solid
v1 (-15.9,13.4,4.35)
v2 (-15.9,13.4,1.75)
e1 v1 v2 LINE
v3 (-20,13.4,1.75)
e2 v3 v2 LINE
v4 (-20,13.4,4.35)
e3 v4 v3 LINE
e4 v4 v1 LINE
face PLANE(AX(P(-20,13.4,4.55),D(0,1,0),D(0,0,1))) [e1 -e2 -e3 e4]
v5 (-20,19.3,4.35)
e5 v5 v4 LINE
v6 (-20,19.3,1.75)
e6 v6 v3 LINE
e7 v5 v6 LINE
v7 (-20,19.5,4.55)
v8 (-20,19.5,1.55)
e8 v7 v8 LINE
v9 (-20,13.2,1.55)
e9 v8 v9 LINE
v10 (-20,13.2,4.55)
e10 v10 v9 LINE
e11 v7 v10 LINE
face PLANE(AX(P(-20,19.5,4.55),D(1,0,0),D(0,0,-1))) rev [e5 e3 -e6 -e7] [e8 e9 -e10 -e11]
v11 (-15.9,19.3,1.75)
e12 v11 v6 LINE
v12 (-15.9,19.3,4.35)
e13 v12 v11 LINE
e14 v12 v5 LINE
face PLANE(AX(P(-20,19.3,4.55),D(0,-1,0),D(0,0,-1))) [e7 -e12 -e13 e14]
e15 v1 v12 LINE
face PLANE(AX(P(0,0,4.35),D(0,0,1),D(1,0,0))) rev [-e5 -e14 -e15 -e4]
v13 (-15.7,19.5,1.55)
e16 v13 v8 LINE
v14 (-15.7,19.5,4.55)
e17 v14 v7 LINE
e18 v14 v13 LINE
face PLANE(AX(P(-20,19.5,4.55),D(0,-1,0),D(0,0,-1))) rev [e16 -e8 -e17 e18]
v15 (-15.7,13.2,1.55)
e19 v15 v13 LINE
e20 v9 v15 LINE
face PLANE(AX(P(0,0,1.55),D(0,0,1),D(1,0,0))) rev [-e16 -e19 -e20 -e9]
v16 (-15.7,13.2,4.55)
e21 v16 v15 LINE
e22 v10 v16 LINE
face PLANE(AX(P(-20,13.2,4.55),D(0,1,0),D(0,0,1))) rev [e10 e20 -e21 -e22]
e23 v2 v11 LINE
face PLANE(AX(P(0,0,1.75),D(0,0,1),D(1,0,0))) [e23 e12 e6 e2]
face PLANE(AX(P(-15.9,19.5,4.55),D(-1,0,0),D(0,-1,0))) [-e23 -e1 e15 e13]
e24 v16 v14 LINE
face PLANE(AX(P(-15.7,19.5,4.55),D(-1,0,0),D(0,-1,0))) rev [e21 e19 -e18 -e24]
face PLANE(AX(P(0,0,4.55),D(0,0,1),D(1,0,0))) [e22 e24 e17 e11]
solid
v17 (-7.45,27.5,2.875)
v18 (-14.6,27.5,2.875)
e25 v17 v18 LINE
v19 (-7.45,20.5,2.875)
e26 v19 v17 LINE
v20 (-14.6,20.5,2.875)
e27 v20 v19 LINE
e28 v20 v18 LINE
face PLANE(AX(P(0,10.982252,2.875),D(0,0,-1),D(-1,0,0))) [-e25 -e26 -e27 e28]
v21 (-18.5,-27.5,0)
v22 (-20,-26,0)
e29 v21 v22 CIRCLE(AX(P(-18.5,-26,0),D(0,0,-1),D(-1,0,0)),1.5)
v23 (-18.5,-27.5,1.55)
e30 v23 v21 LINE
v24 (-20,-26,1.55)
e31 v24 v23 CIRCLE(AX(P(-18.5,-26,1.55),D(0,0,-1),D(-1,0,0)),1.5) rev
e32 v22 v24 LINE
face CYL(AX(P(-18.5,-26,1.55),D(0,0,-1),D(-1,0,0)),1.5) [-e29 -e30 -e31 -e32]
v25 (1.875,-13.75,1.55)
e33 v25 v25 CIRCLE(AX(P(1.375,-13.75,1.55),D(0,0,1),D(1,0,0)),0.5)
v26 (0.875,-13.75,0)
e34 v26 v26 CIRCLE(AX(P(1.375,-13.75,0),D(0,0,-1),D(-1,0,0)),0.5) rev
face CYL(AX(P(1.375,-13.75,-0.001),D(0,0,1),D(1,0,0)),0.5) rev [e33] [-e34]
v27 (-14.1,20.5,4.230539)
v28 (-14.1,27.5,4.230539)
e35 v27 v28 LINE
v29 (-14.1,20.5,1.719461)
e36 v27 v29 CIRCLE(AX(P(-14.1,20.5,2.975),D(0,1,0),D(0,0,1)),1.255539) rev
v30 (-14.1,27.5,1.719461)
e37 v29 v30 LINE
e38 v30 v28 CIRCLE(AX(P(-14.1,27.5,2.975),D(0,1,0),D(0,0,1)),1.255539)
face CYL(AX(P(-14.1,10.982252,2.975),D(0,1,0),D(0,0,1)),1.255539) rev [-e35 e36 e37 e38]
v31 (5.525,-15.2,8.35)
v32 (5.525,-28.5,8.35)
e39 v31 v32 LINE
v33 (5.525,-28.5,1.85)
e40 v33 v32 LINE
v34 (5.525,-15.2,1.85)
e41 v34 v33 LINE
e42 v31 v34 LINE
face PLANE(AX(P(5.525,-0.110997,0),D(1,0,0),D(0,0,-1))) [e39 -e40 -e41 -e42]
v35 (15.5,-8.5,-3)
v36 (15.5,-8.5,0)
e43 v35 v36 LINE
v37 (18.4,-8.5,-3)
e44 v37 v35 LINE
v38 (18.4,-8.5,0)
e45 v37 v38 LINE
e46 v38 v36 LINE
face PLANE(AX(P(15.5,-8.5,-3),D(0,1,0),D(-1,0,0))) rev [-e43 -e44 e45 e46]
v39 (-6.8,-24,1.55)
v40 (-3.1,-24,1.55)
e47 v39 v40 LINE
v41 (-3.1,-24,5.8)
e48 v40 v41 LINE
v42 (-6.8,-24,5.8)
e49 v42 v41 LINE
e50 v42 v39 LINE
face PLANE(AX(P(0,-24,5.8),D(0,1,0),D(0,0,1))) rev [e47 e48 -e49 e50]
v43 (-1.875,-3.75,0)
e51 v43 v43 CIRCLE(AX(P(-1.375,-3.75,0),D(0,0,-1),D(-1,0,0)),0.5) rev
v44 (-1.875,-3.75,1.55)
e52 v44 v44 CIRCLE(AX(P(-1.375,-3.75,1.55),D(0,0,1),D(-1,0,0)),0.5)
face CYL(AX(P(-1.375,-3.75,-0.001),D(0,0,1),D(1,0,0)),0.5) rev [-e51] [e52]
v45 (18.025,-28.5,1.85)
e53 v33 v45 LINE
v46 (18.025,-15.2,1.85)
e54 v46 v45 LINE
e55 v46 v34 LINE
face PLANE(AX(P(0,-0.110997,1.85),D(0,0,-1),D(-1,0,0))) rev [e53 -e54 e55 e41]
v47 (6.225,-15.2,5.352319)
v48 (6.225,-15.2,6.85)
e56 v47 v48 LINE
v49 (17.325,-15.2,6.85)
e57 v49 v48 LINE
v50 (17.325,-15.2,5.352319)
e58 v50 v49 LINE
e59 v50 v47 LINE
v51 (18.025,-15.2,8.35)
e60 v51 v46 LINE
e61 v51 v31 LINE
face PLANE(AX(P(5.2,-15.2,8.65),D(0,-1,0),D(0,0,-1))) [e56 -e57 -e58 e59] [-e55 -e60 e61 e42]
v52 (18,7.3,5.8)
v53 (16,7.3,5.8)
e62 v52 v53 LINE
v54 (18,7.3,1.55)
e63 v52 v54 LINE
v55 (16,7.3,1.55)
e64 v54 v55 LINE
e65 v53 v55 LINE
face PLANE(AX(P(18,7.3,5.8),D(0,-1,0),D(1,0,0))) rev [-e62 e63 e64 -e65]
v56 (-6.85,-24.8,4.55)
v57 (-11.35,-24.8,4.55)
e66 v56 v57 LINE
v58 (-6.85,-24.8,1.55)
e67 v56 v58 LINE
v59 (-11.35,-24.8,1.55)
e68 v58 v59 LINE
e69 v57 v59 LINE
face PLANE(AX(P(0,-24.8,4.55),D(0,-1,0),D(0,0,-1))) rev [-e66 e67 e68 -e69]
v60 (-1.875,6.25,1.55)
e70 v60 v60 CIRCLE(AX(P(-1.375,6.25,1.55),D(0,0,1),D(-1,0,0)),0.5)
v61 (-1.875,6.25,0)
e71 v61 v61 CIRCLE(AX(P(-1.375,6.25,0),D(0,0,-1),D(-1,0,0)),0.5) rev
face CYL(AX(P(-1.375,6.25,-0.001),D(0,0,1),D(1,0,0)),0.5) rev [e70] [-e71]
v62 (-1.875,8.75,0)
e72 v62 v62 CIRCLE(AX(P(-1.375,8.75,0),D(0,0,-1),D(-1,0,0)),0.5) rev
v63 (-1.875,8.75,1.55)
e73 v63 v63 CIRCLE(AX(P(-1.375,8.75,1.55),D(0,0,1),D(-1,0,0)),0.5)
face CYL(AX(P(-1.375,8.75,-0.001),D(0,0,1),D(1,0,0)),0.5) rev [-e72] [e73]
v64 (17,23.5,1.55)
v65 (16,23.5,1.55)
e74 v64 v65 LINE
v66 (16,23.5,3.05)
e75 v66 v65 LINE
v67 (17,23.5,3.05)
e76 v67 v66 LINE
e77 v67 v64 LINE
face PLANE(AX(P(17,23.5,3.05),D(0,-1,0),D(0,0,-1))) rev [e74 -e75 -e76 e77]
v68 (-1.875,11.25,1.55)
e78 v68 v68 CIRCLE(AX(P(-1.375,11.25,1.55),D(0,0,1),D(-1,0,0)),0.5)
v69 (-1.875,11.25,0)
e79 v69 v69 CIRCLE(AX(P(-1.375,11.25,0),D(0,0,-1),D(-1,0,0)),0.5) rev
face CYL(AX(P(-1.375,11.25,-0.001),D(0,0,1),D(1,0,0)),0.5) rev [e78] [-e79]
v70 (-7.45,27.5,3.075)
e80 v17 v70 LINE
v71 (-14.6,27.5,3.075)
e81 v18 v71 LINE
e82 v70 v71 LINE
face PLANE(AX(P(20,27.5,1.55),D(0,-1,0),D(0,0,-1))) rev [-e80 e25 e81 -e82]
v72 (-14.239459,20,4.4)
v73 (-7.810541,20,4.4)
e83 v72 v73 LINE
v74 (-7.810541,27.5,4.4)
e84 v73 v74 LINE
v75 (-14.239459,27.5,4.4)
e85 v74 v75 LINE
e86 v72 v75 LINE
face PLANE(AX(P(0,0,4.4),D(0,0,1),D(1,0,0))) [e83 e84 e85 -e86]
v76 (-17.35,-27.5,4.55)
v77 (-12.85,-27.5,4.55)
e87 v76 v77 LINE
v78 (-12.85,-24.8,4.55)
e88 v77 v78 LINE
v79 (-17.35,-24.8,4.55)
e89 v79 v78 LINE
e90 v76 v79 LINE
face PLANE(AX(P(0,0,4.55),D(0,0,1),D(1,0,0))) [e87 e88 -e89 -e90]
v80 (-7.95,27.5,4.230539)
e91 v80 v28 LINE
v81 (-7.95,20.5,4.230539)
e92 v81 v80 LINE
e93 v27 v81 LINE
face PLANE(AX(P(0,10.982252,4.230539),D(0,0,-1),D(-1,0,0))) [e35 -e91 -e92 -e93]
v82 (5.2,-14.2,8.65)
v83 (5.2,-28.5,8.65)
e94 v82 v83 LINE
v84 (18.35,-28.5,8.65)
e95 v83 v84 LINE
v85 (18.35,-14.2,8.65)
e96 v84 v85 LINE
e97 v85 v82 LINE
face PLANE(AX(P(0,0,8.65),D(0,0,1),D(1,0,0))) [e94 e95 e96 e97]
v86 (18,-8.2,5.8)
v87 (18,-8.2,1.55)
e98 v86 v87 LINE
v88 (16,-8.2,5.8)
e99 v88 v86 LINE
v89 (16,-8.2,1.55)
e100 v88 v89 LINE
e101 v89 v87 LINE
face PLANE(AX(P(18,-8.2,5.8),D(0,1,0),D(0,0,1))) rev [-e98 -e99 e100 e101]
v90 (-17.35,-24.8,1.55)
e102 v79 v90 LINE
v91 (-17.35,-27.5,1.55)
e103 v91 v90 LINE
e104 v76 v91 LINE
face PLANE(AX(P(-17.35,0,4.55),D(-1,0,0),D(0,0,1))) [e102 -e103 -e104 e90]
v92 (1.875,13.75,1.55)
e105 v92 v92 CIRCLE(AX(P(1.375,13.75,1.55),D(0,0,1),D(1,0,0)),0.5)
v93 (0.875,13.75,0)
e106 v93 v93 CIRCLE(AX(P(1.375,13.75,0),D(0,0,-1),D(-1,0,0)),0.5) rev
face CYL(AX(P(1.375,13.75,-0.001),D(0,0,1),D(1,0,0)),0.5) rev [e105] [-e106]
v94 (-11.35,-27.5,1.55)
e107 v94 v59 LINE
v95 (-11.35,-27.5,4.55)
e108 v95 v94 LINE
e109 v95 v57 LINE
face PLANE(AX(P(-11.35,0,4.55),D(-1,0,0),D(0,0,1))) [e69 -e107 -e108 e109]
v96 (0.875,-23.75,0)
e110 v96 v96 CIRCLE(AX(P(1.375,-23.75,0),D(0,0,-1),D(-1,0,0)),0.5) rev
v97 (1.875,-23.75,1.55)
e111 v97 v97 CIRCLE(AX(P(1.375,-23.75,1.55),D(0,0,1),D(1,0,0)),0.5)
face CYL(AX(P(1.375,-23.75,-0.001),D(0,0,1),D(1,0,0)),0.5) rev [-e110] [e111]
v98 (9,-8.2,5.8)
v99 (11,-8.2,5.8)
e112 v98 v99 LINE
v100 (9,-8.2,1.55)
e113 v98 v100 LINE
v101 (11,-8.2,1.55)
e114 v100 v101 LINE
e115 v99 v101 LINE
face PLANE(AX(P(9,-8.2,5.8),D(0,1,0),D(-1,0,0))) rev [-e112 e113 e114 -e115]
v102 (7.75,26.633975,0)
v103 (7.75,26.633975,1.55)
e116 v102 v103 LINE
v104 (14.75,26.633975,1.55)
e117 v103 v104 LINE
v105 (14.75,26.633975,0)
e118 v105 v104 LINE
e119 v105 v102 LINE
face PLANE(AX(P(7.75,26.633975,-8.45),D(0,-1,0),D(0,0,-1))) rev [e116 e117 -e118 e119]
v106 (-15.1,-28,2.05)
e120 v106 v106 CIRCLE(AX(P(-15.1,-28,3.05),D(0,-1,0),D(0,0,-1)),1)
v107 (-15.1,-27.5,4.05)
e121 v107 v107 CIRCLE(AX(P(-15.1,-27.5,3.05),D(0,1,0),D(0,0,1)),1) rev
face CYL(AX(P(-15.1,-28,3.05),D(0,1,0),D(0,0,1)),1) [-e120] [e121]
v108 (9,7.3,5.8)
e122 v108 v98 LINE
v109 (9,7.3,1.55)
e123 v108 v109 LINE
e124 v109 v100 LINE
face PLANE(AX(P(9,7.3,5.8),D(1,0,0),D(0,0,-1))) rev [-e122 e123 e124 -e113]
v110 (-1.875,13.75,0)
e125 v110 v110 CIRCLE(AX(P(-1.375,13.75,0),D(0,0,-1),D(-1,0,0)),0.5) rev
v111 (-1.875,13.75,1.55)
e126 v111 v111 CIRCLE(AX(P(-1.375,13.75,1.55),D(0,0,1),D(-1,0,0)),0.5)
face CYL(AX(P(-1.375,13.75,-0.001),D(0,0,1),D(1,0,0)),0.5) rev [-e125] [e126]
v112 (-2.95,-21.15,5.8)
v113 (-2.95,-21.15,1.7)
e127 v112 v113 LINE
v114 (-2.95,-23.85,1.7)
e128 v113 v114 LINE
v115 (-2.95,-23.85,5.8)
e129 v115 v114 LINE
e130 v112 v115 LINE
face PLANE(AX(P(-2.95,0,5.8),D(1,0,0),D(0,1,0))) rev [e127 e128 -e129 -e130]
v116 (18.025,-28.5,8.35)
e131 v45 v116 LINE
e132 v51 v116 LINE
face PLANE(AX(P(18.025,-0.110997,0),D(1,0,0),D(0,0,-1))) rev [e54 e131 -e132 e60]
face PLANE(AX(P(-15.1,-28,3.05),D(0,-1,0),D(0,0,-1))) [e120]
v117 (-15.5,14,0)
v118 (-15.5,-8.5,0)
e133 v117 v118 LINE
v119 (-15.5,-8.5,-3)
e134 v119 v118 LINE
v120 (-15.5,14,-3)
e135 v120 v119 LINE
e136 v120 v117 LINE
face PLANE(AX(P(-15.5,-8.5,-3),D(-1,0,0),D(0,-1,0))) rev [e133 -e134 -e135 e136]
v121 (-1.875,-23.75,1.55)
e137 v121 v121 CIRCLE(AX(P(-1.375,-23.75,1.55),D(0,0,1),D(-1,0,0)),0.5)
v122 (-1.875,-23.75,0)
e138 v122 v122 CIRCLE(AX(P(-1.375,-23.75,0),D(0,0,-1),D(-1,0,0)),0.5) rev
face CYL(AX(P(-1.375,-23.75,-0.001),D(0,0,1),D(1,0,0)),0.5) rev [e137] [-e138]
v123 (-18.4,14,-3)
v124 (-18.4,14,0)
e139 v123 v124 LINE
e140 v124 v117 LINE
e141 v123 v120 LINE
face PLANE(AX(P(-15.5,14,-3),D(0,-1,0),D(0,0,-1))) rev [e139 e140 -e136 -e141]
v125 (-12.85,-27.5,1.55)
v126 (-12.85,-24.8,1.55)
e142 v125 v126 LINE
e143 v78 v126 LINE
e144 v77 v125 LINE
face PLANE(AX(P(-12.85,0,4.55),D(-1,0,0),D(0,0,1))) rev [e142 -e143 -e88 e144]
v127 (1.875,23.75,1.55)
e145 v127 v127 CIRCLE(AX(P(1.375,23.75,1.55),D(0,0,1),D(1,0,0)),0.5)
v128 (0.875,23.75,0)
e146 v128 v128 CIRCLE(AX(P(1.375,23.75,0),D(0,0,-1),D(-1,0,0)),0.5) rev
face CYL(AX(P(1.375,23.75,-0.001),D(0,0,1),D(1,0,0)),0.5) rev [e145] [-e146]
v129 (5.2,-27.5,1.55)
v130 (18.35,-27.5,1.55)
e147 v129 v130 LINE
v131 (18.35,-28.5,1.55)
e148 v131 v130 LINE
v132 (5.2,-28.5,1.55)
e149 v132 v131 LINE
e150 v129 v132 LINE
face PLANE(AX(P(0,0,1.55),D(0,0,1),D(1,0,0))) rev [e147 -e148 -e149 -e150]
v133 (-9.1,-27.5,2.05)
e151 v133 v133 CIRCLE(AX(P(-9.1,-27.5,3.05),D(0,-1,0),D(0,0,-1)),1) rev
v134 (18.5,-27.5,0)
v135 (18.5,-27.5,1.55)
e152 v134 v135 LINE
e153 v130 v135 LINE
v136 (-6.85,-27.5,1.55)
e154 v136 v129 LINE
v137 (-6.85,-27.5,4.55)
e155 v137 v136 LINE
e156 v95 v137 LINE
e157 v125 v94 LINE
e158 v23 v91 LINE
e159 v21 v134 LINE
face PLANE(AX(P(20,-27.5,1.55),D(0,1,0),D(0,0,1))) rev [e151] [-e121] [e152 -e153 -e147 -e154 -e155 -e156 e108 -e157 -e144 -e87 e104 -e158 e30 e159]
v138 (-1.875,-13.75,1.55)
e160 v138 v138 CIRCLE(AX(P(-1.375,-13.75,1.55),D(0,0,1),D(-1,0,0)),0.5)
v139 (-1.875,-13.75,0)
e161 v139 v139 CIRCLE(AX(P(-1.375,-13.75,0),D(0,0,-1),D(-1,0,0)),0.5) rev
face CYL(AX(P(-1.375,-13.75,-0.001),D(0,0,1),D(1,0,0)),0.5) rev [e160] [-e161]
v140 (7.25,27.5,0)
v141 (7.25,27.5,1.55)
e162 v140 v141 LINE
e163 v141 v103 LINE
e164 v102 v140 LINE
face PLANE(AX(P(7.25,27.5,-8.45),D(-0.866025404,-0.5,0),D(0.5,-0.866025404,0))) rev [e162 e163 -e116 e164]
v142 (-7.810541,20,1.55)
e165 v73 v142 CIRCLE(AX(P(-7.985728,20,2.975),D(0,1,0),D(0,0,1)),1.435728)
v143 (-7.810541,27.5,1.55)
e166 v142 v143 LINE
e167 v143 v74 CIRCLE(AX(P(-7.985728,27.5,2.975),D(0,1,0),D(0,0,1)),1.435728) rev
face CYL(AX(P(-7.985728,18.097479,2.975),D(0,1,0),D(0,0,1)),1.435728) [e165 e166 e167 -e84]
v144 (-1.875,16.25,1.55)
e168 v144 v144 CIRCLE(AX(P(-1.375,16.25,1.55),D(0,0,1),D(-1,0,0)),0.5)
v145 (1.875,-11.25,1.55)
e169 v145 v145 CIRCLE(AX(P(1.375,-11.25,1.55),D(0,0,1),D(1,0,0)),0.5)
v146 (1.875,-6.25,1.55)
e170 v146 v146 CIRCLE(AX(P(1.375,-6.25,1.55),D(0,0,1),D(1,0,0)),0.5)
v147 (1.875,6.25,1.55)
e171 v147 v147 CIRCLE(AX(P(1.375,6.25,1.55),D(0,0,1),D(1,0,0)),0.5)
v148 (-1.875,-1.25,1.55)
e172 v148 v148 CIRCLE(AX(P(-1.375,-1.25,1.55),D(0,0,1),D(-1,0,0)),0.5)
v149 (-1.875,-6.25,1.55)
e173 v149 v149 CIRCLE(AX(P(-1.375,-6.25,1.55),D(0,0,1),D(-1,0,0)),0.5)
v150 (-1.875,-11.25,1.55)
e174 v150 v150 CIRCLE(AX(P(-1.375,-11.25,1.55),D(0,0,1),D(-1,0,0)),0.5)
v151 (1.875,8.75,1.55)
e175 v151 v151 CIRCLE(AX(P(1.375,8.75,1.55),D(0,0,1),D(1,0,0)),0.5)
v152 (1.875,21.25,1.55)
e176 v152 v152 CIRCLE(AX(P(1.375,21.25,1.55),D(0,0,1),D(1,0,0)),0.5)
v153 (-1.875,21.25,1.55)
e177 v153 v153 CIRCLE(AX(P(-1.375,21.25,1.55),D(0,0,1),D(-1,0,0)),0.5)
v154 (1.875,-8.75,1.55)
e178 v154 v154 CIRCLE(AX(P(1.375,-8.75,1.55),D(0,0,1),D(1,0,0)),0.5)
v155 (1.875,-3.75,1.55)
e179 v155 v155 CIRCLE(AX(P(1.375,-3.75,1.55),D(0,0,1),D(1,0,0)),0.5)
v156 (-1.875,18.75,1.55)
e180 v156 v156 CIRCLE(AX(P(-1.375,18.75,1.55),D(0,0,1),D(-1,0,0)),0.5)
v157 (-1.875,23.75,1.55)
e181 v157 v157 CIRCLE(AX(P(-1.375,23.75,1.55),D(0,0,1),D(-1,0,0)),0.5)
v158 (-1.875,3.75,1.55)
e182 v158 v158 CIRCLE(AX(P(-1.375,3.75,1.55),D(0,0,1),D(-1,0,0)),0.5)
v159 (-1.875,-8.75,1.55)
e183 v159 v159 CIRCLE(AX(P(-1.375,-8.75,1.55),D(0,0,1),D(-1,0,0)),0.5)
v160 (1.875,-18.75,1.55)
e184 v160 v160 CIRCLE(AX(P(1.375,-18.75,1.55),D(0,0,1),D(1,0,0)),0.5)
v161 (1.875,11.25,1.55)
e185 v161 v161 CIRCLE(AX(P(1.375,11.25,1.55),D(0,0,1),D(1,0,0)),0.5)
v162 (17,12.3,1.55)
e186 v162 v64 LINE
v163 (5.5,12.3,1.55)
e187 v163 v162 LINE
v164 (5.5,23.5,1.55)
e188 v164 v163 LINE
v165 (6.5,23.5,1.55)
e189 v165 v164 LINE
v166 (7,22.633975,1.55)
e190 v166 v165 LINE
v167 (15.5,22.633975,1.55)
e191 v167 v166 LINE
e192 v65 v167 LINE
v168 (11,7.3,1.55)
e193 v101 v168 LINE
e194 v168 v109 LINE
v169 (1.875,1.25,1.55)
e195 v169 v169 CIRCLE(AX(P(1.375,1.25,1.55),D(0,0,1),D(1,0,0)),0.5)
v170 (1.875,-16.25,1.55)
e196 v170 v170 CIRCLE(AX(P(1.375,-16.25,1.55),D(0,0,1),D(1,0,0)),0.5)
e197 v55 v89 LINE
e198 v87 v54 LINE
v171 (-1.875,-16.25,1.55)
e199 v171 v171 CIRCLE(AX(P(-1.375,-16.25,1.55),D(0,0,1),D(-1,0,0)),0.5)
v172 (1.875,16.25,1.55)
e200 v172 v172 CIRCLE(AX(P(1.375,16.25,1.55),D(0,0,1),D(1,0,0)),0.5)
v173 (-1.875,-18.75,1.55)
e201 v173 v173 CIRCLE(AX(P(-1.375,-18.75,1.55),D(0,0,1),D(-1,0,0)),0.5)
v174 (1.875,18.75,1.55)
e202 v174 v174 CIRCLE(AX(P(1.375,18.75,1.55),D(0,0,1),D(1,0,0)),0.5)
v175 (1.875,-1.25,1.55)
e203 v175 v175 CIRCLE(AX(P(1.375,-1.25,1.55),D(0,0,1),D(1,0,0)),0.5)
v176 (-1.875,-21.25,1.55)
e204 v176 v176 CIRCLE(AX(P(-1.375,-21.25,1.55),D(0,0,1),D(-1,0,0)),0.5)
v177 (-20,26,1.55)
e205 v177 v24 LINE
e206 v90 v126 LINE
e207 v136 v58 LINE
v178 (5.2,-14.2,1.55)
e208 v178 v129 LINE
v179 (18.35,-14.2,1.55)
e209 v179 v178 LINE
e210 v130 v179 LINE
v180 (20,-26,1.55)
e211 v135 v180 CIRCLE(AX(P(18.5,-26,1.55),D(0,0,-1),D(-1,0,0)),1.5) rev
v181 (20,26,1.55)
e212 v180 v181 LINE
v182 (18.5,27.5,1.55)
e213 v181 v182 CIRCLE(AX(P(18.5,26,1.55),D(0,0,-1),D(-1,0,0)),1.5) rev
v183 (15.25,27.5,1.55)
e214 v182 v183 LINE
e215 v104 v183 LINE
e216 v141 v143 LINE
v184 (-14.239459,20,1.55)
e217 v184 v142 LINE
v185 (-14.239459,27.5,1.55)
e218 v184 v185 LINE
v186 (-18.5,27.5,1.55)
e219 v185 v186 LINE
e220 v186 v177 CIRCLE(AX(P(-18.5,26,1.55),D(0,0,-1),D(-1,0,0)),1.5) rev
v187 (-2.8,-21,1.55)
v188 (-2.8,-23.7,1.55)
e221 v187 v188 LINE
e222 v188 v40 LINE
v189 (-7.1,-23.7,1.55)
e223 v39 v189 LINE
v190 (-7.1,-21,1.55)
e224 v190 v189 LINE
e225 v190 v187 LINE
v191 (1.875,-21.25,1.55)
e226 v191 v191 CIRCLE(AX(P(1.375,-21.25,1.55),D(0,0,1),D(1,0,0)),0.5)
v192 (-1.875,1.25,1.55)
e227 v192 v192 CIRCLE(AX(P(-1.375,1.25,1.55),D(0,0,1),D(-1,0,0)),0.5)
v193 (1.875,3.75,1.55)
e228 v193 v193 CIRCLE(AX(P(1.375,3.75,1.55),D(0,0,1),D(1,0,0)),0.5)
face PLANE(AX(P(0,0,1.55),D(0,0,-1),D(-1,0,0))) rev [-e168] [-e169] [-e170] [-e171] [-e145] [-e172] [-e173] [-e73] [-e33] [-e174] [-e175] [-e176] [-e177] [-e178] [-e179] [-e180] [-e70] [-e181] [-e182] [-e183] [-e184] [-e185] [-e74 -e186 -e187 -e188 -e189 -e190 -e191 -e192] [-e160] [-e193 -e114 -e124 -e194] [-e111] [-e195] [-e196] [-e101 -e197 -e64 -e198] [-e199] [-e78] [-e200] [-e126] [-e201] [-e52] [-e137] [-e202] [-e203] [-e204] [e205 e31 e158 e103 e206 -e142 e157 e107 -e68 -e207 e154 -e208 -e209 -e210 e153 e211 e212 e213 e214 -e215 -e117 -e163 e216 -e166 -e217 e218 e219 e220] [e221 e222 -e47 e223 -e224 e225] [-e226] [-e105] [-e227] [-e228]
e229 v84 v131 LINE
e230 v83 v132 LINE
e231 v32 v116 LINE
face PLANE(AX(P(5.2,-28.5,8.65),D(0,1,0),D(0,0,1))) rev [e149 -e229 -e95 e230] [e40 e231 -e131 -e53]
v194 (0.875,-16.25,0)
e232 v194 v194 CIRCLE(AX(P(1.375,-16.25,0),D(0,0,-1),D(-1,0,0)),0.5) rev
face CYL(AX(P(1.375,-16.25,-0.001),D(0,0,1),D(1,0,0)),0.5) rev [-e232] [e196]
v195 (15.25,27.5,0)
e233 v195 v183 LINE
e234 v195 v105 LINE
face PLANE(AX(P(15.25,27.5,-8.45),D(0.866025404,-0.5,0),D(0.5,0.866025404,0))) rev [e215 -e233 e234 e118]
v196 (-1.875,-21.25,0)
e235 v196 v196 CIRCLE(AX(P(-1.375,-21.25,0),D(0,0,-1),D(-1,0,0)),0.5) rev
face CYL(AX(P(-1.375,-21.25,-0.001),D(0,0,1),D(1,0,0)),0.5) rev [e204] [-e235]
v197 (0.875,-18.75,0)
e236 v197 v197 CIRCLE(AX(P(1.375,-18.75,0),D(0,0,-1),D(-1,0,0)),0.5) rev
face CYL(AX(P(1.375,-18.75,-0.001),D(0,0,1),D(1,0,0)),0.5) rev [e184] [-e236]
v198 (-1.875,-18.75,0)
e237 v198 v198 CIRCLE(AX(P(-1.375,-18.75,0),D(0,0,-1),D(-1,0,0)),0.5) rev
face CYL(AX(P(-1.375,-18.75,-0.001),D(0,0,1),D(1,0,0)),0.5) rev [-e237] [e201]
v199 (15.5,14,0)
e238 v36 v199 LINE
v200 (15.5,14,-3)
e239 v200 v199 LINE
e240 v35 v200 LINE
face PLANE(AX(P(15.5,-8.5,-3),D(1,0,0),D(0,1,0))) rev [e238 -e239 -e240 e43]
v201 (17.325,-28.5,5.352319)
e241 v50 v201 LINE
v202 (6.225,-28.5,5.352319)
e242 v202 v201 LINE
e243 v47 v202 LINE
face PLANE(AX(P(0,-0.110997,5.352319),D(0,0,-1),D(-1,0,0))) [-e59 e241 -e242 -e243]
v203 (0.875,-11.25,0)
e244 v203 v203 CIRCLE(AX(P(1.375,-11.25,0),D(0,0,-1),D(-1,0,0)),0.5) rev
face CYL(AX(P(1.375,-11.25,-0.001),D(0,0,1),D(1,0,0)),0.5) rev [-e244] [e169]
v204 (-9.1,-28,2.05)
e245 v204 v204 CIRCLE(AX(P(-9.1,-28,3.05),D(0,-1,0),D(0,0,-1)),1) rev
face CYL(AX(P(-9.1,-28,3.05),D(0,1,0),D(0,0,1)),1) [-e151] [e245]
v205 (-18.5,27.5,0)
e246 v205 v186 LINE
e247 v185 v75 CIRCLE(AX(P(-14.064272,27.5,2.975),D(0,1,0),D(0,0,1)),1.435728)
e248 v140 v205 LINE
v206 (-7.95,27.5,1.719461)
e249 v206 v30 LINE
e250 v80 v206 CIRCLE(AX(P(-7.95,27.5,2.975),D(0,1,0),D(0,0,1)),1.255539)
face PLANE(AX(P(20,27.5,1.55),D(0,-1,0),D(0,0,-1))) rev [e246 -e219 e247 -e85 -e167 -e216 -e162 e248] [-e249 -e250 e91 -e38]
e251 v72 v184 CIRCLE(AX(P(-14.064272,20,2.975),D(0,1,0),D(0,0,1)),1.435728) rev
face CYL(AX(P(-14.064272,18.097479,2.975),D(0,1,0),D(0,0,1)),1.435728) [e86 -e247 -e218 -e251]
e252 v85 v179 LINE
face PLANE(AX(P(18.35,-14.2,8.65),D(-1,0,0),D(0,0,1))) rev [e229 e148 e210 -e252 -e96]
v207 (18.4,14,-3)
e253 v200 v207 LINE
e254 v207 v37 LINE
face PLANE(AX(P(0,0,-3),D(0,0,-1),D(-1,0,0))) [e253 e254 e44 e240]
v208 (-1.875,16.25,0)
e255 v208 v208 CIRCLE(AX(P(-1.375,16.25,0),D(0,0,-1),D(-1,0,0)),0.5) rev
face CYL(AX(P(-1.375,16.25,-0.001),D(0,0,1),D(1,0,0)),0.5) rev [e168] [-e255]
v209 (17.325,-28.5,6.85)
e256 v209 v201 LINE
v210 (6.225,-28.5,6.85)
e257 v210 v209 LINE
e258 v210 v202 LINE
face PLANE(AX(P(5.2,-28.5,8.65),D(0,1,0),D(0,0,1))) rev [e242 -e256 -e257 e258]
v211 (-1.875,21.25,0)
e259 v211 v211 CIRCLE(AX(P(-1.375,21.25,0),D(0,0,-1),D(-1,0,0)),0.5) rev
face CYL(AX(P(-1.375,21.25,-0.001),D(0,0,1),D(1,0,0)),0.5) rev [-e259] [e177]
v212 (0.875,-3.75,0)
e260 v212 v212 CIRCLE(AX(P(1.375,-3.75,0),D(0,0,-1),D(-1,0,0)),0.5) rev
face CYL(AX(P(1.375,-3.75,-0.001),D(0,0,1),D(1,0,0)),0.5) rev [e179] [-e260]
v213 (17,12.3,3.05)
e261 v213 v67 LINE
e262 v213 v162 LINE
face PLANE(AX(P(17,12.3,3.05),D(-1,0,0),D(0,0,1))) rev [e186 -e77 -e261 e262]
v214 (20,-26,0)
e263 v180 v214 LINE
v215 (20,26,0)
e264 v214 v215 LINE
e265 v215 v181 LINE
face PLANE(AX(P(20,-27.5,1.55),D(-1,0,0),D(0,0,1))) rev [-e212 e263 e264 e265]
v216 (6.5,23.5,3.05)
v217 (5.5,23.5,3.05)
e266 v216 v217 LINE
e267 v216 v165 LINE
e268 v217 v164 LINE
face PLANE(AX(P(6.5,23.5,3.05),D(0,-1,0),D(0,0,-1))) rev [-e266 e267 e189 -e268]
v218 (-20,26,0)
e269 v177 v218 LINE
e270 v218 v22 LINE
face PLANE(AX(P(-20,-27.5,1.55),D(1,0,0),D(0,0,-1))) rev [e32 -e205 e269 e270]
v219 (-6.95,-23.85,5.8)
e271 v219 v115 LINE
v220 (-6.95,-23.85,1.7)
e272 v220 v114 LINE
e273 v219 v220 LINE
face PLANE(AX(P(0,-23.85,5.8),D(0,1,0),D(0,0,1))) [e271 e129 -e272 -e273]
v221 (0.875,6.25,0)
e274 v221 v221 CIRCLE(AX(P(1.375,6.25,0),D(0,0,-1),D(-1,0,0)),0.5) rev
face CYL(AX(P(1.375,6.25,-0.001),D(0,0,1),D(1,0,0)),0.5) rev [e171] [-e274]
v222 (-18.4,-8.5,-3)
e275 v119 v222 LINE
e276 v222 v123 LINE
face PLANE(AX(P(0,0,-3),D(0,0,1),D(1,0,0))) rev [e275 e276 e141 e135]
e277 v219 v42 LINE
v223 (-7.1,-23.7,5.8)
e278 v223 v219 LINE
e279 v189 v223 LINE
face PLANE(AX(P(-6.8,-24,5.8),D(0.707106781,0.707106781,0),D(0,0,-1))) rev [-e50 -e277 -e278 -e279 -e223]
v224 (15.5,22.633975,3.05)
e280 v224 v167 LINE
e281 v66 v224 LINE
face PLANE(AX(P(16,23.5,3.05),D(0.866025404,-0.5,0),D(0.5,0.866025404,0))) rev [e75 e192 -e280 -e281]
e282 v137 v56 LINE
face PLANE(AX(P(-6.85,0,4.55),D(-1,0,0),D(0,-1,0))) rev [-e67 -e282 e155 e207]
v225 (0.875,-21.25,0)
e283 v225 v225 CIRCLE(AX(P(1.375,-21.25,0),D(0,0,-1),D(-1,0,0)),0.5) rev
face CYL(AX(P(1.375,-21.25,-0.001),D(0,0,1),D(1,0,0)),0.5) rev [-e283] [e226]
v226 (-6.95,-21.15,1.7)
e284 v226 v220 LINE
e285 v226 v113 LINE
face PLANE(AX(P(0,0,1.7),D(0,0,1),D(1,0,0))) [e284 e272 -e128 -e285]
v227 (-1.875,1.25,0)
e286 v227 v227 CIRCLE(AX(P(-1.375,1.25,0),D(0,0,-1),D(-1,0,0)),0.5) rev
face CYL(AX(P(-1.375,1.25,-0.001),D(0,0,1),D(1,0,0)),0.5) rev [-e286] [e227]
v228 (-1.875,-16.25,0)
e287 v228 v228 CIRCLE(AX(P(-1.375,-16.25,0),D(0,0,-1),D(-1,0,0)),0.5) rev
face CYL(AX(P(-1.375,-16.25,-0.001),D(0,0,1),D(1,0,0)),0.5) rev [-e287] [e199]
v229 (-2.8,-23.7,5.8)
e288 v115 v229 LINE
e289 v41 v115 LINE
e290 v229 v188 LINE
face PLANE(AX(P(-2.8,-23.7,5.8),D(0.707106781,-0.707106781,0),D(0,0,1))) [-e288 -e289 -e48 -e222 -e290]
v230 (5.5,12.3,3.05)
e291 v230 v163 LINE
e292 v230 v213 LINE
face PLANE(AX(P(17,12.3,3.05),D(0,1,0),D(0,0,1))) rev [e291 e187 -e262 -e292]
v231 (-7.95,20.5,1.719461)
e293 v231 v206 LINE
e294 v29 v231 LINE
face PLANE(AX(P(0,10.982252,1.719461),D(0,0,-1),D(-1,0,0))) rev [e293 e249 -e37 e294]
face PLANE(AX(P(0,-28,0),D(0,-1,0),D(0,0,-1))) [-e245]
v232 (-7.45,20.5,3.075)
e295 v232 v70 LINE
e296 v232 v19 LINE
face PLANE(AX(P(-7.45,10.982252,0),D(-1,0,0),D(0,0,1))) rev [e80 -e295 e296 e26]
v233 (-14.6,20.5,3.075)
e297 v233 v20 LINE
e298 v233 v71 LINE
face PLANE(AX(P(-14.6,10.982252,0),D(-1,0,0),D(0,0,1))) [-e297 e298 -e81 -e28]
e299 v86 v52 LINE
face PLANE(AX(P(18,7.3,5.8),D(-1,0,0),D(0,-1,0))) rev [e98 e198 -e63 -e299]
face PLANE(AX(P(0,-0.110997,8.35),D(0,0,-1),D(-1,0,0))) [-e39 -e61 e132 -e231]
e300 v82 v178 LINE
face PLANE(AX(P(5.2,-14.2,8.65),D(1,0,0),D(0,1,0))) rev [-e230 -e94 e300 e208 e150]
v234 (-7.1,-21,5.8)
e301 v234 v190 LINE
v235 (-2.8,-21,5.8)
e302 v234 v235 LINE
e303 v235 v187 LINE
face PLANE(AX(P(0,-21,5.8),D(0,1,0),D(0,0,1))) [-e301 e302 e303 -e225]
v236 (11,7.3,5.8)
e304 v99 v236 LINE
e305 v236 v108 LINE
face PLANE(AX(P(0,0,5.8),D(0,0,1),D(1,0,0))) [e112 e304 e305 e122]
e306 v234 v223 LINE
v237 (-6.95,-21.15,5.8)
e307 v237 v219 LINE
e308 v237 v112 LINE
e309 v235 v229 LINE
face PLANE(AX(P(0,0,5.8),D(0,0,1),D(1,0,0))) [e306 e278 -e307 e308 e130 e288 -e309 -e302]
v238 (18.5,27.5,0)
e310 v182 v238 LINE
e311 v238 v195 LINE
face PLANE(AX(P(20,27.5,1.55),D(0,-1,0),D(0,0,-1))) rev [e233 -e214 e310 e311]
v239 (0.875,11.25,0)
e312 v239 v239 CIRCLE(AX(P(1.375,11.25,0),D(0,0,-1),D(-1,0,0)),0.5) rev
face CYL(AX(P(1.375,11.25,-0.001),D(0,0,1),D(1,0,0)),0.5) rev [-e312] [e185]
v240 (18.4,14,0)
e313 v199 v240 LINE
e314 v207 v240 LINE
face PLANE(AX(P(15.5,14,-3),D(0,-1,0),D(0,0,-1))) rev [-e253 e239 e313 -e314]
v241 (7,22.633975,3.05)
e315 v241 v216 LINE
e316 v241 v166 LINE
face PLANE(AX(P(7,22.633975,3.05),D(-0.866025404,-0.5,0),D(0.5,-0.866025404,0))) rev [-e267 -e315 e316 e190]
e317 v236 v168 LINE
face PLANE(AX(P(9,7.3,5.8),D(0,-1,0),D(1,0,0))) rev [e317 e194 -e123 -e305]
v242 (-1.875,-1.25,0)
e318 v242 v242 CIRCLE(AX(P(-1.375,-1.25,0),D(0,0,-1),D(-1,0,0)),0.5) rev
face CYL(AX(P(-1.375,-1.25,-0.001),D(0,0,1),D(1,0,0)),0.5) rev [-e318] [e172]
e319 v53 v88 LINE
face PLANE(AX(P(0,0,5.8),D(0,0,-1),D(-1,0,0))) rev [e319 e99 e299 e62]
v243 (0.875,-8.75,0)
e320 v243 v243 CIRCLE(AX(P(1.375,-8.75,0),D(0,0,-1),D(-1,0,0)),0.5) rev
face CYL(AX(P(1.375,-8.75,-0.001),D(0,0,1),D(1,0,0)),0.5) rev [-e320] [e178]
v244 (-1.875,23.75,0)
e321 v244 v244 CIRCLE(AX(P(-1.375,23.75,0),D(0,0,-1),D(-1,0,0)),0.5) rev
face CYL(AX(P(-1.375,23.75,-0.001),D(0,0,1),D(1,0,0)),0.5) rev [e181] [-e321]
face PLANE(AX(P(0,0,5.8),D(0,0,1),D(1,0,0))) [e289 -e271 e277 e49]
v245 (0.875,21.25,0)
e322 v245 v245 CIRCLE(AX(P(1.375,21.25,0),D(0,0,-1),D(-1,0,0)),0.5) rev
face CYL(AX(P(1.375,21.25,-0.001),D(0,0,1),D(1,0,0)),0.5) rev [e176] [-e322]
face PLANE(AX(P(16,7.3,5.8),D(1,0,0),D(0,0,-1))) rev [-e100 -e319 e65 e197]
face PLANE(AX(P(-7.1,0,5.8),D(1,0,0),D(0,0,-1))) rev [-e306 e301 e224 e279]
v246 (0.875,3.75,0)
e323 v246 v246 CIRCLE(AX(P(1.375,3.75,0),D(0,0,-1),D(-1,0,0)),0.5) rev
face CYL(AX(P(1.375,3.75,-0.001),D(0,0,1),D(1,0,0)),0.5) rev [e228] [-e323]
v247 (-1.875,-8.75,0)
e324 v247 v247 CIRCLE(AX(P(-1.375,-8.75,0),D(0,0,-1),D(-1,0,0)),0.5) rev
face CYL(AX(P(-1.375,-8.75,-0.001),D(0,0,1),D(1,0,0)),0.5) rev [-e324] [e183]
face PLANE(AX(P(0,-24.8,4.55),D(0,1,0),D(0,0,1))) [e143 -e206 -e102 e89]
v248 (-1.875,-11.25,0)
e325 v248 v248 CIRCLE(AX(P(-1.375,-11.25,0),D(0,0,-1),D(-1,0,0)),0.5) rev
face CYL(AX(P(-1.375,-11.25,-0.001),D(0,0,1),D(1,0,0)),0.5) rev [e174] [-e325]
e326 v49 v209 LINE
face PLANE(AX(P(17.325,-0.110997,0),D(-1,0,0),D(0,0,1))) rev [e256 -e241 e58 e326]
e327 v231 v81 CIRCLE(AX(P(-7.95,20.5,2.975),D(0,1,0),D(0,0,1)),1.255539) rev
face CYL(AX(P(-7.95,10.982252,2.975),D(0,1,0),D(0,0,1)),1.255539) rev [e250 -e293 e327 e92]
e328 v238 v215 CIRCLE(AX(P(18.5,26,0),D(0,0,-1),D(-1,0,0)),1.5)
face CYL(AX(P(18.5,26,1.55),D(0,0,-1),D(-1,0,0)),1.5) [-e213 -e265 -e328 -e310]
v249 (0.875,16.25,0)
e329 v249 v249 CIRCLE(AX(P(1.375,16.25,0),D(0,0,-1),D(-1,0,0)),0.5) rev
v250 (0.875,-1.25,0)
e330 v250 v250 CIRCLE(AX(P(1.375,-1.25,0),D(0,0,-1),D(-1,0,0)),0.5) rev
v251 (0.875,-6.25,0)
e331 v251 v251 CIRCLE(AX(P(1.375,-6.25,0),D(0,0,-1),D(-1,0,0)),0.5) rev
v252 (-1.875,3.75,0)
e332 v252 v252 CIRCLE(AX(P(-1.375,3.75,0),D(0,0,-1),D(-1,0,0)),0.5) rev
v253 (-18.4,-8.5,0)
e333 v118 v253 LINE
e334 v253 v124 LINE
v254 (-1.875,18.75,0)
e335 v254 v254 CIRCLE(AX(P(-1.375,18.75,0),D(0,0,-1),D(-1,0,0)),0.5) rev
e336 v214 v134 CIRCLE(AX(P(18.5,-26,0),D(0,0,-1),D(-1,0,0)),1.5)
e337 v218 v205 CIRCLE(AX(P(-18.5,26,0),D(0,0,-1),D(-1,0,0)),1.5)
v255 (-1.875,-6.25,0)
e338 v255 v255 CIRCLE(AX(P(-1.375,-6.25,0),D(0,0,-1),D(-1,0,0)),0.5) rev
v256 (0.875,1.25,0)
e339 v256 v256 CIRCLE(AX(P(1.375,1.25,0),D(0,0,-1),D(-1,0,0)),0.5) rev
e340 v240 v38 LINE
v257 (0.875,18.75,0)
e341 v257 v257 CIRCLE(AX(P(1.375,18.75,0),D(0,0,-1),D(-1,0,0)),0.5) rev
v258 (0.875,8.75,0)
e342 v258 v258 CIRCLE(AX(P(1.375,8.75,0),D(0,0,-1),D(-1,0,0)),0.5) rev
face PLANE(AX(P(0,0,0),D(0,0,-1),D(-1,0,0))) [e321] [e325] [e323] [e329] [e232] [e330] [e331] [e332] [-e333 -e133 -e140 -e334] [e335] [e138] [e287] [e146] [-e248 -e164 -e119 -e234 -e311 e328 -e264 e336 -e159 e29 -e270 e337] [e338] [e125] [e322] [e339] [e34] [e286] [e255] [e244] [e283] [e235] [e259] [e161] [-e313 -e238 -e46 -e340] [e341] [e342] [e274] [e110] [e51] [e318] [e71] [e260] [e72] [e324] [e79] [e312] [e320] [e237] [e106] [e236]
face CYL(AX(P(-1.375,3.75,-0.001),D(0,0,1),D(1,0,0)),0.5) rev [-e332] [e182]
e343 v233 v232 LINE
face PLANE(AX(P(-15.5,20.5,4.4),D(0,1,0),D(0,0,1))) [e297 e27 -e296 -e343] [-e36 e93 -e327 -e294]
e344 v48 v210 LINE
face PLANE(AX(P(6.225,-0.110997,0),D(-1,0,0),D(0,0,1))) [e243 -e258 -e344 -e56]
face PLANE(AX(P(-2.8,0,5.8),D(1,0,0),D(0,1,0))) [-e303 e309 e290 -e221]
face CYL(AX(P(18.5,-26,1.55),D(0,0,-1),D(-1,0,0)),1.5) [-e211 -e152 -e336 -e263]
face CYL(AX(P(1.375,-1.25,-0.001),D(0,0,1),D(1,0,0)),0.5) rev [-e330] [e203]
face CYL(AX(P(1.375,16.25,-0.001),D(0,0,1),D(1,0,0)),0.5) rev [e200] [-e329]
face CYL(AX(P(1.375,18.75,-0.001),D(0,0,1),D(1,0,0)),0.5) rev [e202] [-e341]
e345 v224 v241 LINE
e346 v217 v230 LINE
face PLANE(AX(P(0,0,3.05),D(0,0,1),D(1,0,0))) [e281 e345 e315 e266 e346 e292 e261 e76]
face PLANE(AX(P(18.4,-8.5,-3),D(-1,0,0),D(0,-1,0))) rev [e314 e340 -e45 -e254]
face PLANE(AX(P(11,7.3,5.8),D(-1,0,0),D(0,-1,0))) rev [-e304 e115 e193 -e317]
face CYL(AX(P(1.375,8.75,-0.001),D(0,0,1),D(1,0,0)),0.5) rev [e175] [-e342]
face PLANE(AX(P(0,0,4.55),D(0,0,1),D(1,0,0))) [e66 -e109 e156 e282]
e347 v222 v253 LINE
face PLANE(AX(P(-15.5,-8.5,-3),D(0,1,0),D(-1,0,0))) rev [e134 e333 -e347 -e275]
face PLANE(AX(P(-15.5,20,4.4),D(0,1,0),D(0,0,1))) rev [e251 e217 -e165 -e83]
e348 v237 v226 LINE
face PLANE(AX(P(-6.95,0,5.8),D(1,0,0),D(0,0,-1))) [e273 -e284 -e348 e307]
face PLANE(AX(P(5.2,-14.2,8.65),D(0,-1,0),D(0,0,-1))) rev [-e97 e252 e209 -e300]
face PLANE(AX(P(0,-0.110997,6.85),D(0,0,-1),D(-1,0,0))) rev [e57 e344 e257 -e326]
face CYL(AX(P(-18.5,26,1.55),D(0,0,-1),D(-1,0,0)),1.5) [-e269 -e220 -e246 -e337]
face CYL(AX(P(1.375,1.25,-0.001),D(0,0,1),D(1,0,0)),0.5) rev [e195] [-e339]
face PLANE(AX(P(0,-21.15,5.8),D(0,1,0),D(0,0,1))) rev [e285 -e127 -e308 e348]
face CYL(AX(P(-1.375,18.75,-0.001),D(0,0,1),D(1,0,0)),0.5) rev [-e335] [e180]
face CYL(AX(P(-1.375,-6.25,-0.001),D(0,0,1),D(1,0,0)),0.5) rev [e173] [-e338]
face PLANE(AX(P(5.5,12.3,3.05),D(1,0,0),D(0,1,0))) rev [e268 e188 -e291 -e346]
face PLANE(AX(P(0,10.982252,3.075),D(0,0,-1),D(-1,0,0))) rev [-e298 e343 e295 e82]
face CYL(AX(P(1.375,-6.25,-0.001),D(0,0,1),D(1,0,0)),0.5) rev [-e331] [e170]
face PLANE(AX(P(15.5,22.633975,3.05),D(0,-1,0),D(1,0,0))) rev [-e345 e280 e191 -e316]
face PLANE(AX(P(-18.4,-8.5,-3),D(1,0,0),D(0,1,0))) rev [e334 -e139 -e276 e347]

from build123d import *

# Parameters (mm, degrees)
SKETCH1_W            = 55
SKETCH1_H            = 40
BOSS_EXTRUDE1_DEPTH  = 1.55
FILLET1_R            = 1.5
SKETCH2_W            = 13.15
SKETCH2_H            = 14.3
BOSS_EXTRUDE2_DEPTH  = 7.1
SKETCH3_W            = 12.5
SKETCH3_H            = 6.5
SKETCH3_W_2          = 11.1
SKETCH3_H_2          = 1.497681088
CUT_EXTRUDE1_DEPTH   = 13.3
SKETCH4_W            = 8.95
SKETCH4_H            = 7.5
BOSS_EXTRUDE3_DEPTH  = 2.85
CUT_EXTRUDE2_DEPTH   = 7.5
SKETCH5_3_W          = 7.15
SKETCH5_3_H          = 0.2
CUT_EXTRUDE3_DEPTH   = 7
BOSS_EXTRUDE4_DEPTH  = 1.5
CUT_EXTRUDE4_DEPTH   = 10
SKETCH8_W            = 4.5
SKETCH8_H            = 2.7
BOSS_EXTRUDE5_DEPTH  = 3
SKETCH9_R            = 1
BOSS_EXTRUDE6_DEPTH  = 0.5
SKETCH10_W           = 2
SKETCH10_H           = 15.5
BOSS_EXTRUDE7_DEPTH  = 4.25
SKETCH8_4_W          = 4.3
SKETCH8_4_H          = 3
BOSS_EXTRUDE9_DEPTH  = 4.25
SHELL2_T             = -0.15
CHAMFER1_SIZE        = 0.3
SKETCH11_R           = 0.5
CUT_EXTRUDE5_DEPTH   = 1.55
SKETCH12_W           = 4.3
SKETCH12_H           = 6.3
BOSS_EXTRUDE10_DEPTH = 3
SHELL3_T             = -0.2
SKETCH13_W           = 2.9
SKETCH13_H           = 22.5
BOSS_EXTRUDE11_DEPTH = 3


with BuildPart() as part:
    # Sketch1 → Boss-Extrude1 (new body)
    with BuildSketch(Plane(origin=(0, 0, 0), x_dir=(0, 1, 0), z_dir=(0, 0, 1))):
        Rectangle(SKETCH1_W, SKETCH1_H)
    extrude(amount=BOSS_EXTRUDE1_DEPTH)

    # Fillet1
    fillet1_edges = [part.edges().sort_by_distance(p)[0] for p in [
        (20, 27.5, 0.775),
        (20, -27.5, 0.775),
        (-20, -27.5, 0.775),
        (-20, 27.5, 0.775),
    ]]
    fillet(fillet1_edges, radius=FILLET1_R)

    # Sketch2 → Boss-Extrude2 (add)
    with BuildSketch(Plane.XY.offset(1.55)):
        with Locations((11.775, -21.35)):
            Rectangle(SKETCH2_W, SKETCH2_H)
    extrude(amount=BOSS_EXTRUDE2_DEPTH)

    # Sketch3 → Cut-Extrude1 (cut)
    with BuildSketch(Plane.XZ.offset(28.5)):
        with Locations((11.775, 5.1)):
            Rectangle(SKETCH3_W, SKETCH3_H)
        with Locations((11.775, 6.101159456)):
            Rectangle(SKETCH3_W_2, SKETCH3_H_2, mode=Mode.SUBTRACT)
    extrude(amount=-CUT_EXTRUDE1_DEPTH, mode=Mode.SUBTRACT)

    # Sketch4 → Boss-Extrude3 (add)
    with BuildSketch(Plane.XY.offset(1.55)):
        with Locations((-11.025, 23.75)):
            Rectangle(SKETCH4_W, SKETCH4_H)
    extrude(amount=BOSS_EXTRUDE3_DEPTH)

    # Sketch5 → Cut-Extrude2 (cut)
    with BuildSketch(Plane(origin=(0, 27.5, 0), x_dir=(-1, 0, 0), z_dir=(0, 1, 0))):
        with BuildLine():
            Line((6.55, 4.4), (6.55, 2.975))
            ThreePointArc((6.55, 2.975), (6.910359128, 3.926260685), (7.810540583, 4.4))
            Line((7.810540583, 4.4), (6.55, 4.4))
        make_face()
        with BuildLine():
            Line((6.55, 1.55), (7.810540583, 1.55))
            ThreePointArc((7.810540583, 1.55), (6.910359128, 2.023739315), (6.55, 2.975))
            Line((6.55, 2.975), (6.55, 1.55))
        make_face()
        with BuildLine():
            Line((15.5, 1.55), (15.5, 2.975))
            ThreePointArc((15.5, 2.975), (15.139640872, 2.023739315), (14.239459417, 1.55))
            Line((14.239459417, 1.55), (15.5, 1.55))
        make_face()
        with BuildLine():
            Line((15.5, 4.4), (14.239459417, 4.4))
            ThreePointArc((14.239459417, 4.4), (15.139640872, 3.926260685), (15.5, 2.975))
            Line((15.5, 2.975), (15.5, 4.4))
        make_face()
    extrude(amount=-CUT_EXTRUDE2_DEPTH, mode=Mode.SUBTRACT)

    # Sketch5<3> → Cut-Extrude3 (cut)
    with BuildSketch(Plane(origin=(0, 27.5, 0), x_dir=(-1, 0, 0), z_dir=(0, 1, 0))):
        with BuildLine():
            Line((7.95, 1.719461162), (14.1, 1.719461162))
            ThreePointArc((14.1, 1.719461162), (15.355538838, 2.975), (14.1, 4.230538838))
            Line((14.1, 4.230538838), (7.95, 4.230538838))
            ThreePointArc((7.95, 4.230538838), (6.694461162, 2.975), (7.95, 1.719461162))
        make_face()
        with Locations((11.025, 2.975)):
            Rectangle(SKETCH5_3_W, SKETCH5_3_H, mode=Mode.SUBTRACT)
    extrude(amount=-CUT_EXTRUDE3_DEPTH, mode=Mode.SUBTRACT)

    # Sketch6 → Boss-Extrude4 (add)
    with BuildSketch(Plane.XY.offset(1.55)):
        Polygon((16, 23.5), (15.5, 22.633974596), (7, 22.633974596), (6.5, 23.5), (5.5, 23.5), (5.5, 12.3), (17, 12.3), (17, 23.5), align=None)
    extrude(amount=BOSS_EXTRUDE4_DEPTH)

    # Sketch7 → Cut-Extrude4 (cut)
    with BuildSketch(Plane.XY.offset(1.55)):
        Polygon((7.25, 27.5), (7.75, 26.633974596), (14.75, 26.633974596), (15.25, 27.5), align=None)
    extrude(amount=-CUT_EXTRUDE4_DEPTH, mode=Mode.SUBTRACT)

    # Sketch8 → Boss-Extrude5 (add)
    with BuildSketch(Plane.XY.offset(1.55)):
        with Locations((-9.1, -26.15)):
            Rectangle(SKETCH8_W, SKETCH8_H)
        with Locations((-15.1, -26.15)):
            Rectangle(SKETCH8_W, SKETCH8_H)
    extrude(amount=BOSS_EXTRUDE5_DEPTH)

    # Sketch9 → Boss-Extrude6 (add)
    with BuildSketch(Plane.XZ.offset(27.5)):
        with Locations(Location((-9.1, 3.05, 0), (0, 0, 270))):
            Circle(SKETCH9_R)
        with Locations(Location((-15.1, 3.05, 0), (0, 0, 90))):
            Circle(SKETCH9_R)
    extrude(amount=BOSS_EXTRUDE6_DEPTH)

    # Sketch10 → Boss-Extrude7 (add)
    with BuildSketch(Plane.XY.offset(1.55)):
        with Locations((17, -0.45)):
            Rectangle(SKETCH10_W, SKETCH10_H)
        with Locations((10, -0.45)):
            Rectangle(SKETCH10_W, SKETCH10_H)
    extrude(amount=BOSS_EXTRUDE7_DEPTH)


with BuildPart() as body_2:
    # Sketch8<4> → Boss-Extrude9 (new body)
    with BuildSketch(Plane.XY.offset(1.55)):
        with Locations((-4.95, -22.5)):
            Rectangle(SKETCH8_4_W, SKETCH8_4_H)
    extrude(amount=BOSS_EXTRUDE9_DEPTH)

    # Shell2
    shell2_openings = [body_2.faces().sort_by_distance(p)[0] for p in [
        (-4.95, -22.5, 5.8),
    ]]
    offset(amount=SHELL2_T, openings=shell2_openings, kind=Kind.INTERSECTION)


with BuildPart() as part_1:
    add(part.part)

    # Combine1: union body 2
    add(body_2.part)

    # Chamfer1
    chamfer1_edges = [part_1.edges().sort_by_distance(p)[0] for p in [
        (-2.8, -24, 3.675),
        (-7.1, -24, 3.675),
    ]]
    chamfer(chamfer1_edges, length=CHAMFER1_SIZE - 0.0001)  # a hair under: the kernel refuses the full size

    # Sketch11 → Cut-Extrude5 (cut)
    with BuildSketch(Plane.XY.offset(1.55)):
        with Locations((1.375, 23.75)):
            Circle(SKETCH11_R)
        with Locations((1.375, 21.25)):
            Circle(SKETCH11_R)
        with Locations((1.375, 18.75)):
            Circle(SKETCH11_R)
        with Locations((1.375, 16.25)):
            Circle(SKETCH11_R)
        with Locations((1.375, 13.75)):
            Circle(SKETCH11_R)
        with Locations((1.375, 11.25)):
            Circle(SKETCH11_R)
        with Locations((1.375, 8.75)):
            Circle(SKETCH11_R)
        with Locations((1.375, 6.25)):
            Circle(SKETCH11_R)
        with Locations((1.375, 3.75)):
            Circle(SKETCH11_R)
        with Locations((1.375, 1.25)):
            Circle(SKETCH11_R)
        with Locations((1.375, -1.25)):
            Circle(SKETCH11_R)
        with Locations((1.375, -3.75)):
            Circle(SKETCH11_R)
        with Locations((1.375, -6.25)):
            Circle(SKETCH11_R)
        with Locations((1.375, -8.75)):
            Circle(SKETCH11_R)
        with Locations((1.375, -11.25)):
            Circle(SKETCH11_R)
        with Locations((1.375, -13.75)):
            Circle(SKETCH11_R)
        with Locations((1.375, -16.25)):
            Circle(SKETCH11_R)
        with Locations((1.375, -18.75)):
            Circle(SKETCH11_R)
        with Locations((1.375, -21.25)):
            Circle(SKETCH11_R)
        with Locations((1.375, -23.75)):
            Circle(SKETCH11_R)
        with Locations(Location((-1.375, -23.75, 0), (0, 0, 180))):
            Circle(SKETCH11_R)
        with Locations(Location((-1.375, -21.25, 0), (0, 0, 180))):
            Circle(SKETCH11_R)
        with Locations(Location((-1.375, -18.75, 0), (0, 0, 180))):
            Circle(SKETCH11_R)
        with Locations(Location((-1.375, -16.25, 0), (0, 0, 180))):
            Circle(SKETCH11_R)
        with Locations(Location((-1.375, -13.75, 0), (0, 0, 180))):
            Circle(SKETCH11_R)
        with Locations(Location((-1.375, -11.25, 0), (0, 0, 180))):
            Circle(SKETCH11_R)
        with Locations(Location((-1.375, -8.75, 0), (0, 0, 180))):
            Circle(SKETCH11_R)
        with Locations(Location((-1.375, -6.25, 0), (0, 0, 180))):
            Circle(SKETCH11_R)
        with Locations(Location((-1.375, -3.75, 0), (0, 0, 180))):
            Circle(SKETCH11_R)
        with Locations(Location((-1.375, -1.25, 0), (0, 0, 180))):
            Circle(SKETCH11_R)
        with Locations(Location((-1.375, 1.25, 0), (0, 0, 180))):
            Circle(SKETCH11_R)
        with Locations(Location((-1.375, 3.75, 0), (0, 0, 180))):
            Circle(SKETCH11_R)
        with Locations(Location((-1.375, 6.25, 0), (0, 0, 180))):
            Circle(SKETCH11_R)
        with Locations(Location((-1.375, 8.75, 0), (0, 0, 180))):
            Circle(SKETCH11_R)
        with Locations(Location((-1.375, 11.25, 0), (0, 0, 180))):
            Circle(SKETCH11_R)
        with Locations(Location((-1.375, 13.75, 0), (0, 0, 180))):
            Circle(SKETCH11_R)
        with Locations(Location((-1.375, 16.25, 0), (0, 0, 180))):
            Circle(SKETCH11_R)
        with Locations(Location((-1.375, 18.75, 0), (0, 0, 180))):
            Circle(SKETCH11_R)
        with Locations(Location((-1.375, 23.75, 0), (0, 0, 180))):
            Circle(SKETCH11_R)
        with Locations(Location((-1.375, 21.25, 0), (0, 0, 180))):
            Circle(SKETCH11_R)
    extrude(amount=-CUT_EXTRUDE5_DEPTH, mode=Mode.SUBTRACT)

    # Sketch13 → Boss-Extrude11 (add)
    with BuildSketch(Plane(origin=(0, 0, 0), x_dir=(1, 0, 0), z_dir=(0, 0, -1))):
        with Locations((16.95, -2.75)):
            Rectangle(SKETCH13_W, SKETCH13_H)
        with Locations((-16.95, -2.75)):
            Rectangle(SKETCH13_W, SKETCH13_H)
    extrude(amount=BOSS_EXTRUDE11_DEPTH)


with BuildPart() as body_2_2:
    # Sketch12 → Boss-Extrude10 (new body)
    with BuildSketch(Plane.XY.offset(1.55)):
        with Locations((-17.85, 16.35)):
            Rectangle(SKETCH12_W, SKETCH12_H)
    extrude(amount=BOSS_EXTRUDE10_DEPTH)

    # Shell3
    shell3_openings = [body_2_2.faces().sort_by_distance(p)[0] for p in [
        (-20, 16.35, 3.05),
    ]]
    offset(amount=SHELL3_T, openings=shell3_openings, kind=Kind.INTERSECTION)


solid = Compound([part_1.part, body_2_2.part])
